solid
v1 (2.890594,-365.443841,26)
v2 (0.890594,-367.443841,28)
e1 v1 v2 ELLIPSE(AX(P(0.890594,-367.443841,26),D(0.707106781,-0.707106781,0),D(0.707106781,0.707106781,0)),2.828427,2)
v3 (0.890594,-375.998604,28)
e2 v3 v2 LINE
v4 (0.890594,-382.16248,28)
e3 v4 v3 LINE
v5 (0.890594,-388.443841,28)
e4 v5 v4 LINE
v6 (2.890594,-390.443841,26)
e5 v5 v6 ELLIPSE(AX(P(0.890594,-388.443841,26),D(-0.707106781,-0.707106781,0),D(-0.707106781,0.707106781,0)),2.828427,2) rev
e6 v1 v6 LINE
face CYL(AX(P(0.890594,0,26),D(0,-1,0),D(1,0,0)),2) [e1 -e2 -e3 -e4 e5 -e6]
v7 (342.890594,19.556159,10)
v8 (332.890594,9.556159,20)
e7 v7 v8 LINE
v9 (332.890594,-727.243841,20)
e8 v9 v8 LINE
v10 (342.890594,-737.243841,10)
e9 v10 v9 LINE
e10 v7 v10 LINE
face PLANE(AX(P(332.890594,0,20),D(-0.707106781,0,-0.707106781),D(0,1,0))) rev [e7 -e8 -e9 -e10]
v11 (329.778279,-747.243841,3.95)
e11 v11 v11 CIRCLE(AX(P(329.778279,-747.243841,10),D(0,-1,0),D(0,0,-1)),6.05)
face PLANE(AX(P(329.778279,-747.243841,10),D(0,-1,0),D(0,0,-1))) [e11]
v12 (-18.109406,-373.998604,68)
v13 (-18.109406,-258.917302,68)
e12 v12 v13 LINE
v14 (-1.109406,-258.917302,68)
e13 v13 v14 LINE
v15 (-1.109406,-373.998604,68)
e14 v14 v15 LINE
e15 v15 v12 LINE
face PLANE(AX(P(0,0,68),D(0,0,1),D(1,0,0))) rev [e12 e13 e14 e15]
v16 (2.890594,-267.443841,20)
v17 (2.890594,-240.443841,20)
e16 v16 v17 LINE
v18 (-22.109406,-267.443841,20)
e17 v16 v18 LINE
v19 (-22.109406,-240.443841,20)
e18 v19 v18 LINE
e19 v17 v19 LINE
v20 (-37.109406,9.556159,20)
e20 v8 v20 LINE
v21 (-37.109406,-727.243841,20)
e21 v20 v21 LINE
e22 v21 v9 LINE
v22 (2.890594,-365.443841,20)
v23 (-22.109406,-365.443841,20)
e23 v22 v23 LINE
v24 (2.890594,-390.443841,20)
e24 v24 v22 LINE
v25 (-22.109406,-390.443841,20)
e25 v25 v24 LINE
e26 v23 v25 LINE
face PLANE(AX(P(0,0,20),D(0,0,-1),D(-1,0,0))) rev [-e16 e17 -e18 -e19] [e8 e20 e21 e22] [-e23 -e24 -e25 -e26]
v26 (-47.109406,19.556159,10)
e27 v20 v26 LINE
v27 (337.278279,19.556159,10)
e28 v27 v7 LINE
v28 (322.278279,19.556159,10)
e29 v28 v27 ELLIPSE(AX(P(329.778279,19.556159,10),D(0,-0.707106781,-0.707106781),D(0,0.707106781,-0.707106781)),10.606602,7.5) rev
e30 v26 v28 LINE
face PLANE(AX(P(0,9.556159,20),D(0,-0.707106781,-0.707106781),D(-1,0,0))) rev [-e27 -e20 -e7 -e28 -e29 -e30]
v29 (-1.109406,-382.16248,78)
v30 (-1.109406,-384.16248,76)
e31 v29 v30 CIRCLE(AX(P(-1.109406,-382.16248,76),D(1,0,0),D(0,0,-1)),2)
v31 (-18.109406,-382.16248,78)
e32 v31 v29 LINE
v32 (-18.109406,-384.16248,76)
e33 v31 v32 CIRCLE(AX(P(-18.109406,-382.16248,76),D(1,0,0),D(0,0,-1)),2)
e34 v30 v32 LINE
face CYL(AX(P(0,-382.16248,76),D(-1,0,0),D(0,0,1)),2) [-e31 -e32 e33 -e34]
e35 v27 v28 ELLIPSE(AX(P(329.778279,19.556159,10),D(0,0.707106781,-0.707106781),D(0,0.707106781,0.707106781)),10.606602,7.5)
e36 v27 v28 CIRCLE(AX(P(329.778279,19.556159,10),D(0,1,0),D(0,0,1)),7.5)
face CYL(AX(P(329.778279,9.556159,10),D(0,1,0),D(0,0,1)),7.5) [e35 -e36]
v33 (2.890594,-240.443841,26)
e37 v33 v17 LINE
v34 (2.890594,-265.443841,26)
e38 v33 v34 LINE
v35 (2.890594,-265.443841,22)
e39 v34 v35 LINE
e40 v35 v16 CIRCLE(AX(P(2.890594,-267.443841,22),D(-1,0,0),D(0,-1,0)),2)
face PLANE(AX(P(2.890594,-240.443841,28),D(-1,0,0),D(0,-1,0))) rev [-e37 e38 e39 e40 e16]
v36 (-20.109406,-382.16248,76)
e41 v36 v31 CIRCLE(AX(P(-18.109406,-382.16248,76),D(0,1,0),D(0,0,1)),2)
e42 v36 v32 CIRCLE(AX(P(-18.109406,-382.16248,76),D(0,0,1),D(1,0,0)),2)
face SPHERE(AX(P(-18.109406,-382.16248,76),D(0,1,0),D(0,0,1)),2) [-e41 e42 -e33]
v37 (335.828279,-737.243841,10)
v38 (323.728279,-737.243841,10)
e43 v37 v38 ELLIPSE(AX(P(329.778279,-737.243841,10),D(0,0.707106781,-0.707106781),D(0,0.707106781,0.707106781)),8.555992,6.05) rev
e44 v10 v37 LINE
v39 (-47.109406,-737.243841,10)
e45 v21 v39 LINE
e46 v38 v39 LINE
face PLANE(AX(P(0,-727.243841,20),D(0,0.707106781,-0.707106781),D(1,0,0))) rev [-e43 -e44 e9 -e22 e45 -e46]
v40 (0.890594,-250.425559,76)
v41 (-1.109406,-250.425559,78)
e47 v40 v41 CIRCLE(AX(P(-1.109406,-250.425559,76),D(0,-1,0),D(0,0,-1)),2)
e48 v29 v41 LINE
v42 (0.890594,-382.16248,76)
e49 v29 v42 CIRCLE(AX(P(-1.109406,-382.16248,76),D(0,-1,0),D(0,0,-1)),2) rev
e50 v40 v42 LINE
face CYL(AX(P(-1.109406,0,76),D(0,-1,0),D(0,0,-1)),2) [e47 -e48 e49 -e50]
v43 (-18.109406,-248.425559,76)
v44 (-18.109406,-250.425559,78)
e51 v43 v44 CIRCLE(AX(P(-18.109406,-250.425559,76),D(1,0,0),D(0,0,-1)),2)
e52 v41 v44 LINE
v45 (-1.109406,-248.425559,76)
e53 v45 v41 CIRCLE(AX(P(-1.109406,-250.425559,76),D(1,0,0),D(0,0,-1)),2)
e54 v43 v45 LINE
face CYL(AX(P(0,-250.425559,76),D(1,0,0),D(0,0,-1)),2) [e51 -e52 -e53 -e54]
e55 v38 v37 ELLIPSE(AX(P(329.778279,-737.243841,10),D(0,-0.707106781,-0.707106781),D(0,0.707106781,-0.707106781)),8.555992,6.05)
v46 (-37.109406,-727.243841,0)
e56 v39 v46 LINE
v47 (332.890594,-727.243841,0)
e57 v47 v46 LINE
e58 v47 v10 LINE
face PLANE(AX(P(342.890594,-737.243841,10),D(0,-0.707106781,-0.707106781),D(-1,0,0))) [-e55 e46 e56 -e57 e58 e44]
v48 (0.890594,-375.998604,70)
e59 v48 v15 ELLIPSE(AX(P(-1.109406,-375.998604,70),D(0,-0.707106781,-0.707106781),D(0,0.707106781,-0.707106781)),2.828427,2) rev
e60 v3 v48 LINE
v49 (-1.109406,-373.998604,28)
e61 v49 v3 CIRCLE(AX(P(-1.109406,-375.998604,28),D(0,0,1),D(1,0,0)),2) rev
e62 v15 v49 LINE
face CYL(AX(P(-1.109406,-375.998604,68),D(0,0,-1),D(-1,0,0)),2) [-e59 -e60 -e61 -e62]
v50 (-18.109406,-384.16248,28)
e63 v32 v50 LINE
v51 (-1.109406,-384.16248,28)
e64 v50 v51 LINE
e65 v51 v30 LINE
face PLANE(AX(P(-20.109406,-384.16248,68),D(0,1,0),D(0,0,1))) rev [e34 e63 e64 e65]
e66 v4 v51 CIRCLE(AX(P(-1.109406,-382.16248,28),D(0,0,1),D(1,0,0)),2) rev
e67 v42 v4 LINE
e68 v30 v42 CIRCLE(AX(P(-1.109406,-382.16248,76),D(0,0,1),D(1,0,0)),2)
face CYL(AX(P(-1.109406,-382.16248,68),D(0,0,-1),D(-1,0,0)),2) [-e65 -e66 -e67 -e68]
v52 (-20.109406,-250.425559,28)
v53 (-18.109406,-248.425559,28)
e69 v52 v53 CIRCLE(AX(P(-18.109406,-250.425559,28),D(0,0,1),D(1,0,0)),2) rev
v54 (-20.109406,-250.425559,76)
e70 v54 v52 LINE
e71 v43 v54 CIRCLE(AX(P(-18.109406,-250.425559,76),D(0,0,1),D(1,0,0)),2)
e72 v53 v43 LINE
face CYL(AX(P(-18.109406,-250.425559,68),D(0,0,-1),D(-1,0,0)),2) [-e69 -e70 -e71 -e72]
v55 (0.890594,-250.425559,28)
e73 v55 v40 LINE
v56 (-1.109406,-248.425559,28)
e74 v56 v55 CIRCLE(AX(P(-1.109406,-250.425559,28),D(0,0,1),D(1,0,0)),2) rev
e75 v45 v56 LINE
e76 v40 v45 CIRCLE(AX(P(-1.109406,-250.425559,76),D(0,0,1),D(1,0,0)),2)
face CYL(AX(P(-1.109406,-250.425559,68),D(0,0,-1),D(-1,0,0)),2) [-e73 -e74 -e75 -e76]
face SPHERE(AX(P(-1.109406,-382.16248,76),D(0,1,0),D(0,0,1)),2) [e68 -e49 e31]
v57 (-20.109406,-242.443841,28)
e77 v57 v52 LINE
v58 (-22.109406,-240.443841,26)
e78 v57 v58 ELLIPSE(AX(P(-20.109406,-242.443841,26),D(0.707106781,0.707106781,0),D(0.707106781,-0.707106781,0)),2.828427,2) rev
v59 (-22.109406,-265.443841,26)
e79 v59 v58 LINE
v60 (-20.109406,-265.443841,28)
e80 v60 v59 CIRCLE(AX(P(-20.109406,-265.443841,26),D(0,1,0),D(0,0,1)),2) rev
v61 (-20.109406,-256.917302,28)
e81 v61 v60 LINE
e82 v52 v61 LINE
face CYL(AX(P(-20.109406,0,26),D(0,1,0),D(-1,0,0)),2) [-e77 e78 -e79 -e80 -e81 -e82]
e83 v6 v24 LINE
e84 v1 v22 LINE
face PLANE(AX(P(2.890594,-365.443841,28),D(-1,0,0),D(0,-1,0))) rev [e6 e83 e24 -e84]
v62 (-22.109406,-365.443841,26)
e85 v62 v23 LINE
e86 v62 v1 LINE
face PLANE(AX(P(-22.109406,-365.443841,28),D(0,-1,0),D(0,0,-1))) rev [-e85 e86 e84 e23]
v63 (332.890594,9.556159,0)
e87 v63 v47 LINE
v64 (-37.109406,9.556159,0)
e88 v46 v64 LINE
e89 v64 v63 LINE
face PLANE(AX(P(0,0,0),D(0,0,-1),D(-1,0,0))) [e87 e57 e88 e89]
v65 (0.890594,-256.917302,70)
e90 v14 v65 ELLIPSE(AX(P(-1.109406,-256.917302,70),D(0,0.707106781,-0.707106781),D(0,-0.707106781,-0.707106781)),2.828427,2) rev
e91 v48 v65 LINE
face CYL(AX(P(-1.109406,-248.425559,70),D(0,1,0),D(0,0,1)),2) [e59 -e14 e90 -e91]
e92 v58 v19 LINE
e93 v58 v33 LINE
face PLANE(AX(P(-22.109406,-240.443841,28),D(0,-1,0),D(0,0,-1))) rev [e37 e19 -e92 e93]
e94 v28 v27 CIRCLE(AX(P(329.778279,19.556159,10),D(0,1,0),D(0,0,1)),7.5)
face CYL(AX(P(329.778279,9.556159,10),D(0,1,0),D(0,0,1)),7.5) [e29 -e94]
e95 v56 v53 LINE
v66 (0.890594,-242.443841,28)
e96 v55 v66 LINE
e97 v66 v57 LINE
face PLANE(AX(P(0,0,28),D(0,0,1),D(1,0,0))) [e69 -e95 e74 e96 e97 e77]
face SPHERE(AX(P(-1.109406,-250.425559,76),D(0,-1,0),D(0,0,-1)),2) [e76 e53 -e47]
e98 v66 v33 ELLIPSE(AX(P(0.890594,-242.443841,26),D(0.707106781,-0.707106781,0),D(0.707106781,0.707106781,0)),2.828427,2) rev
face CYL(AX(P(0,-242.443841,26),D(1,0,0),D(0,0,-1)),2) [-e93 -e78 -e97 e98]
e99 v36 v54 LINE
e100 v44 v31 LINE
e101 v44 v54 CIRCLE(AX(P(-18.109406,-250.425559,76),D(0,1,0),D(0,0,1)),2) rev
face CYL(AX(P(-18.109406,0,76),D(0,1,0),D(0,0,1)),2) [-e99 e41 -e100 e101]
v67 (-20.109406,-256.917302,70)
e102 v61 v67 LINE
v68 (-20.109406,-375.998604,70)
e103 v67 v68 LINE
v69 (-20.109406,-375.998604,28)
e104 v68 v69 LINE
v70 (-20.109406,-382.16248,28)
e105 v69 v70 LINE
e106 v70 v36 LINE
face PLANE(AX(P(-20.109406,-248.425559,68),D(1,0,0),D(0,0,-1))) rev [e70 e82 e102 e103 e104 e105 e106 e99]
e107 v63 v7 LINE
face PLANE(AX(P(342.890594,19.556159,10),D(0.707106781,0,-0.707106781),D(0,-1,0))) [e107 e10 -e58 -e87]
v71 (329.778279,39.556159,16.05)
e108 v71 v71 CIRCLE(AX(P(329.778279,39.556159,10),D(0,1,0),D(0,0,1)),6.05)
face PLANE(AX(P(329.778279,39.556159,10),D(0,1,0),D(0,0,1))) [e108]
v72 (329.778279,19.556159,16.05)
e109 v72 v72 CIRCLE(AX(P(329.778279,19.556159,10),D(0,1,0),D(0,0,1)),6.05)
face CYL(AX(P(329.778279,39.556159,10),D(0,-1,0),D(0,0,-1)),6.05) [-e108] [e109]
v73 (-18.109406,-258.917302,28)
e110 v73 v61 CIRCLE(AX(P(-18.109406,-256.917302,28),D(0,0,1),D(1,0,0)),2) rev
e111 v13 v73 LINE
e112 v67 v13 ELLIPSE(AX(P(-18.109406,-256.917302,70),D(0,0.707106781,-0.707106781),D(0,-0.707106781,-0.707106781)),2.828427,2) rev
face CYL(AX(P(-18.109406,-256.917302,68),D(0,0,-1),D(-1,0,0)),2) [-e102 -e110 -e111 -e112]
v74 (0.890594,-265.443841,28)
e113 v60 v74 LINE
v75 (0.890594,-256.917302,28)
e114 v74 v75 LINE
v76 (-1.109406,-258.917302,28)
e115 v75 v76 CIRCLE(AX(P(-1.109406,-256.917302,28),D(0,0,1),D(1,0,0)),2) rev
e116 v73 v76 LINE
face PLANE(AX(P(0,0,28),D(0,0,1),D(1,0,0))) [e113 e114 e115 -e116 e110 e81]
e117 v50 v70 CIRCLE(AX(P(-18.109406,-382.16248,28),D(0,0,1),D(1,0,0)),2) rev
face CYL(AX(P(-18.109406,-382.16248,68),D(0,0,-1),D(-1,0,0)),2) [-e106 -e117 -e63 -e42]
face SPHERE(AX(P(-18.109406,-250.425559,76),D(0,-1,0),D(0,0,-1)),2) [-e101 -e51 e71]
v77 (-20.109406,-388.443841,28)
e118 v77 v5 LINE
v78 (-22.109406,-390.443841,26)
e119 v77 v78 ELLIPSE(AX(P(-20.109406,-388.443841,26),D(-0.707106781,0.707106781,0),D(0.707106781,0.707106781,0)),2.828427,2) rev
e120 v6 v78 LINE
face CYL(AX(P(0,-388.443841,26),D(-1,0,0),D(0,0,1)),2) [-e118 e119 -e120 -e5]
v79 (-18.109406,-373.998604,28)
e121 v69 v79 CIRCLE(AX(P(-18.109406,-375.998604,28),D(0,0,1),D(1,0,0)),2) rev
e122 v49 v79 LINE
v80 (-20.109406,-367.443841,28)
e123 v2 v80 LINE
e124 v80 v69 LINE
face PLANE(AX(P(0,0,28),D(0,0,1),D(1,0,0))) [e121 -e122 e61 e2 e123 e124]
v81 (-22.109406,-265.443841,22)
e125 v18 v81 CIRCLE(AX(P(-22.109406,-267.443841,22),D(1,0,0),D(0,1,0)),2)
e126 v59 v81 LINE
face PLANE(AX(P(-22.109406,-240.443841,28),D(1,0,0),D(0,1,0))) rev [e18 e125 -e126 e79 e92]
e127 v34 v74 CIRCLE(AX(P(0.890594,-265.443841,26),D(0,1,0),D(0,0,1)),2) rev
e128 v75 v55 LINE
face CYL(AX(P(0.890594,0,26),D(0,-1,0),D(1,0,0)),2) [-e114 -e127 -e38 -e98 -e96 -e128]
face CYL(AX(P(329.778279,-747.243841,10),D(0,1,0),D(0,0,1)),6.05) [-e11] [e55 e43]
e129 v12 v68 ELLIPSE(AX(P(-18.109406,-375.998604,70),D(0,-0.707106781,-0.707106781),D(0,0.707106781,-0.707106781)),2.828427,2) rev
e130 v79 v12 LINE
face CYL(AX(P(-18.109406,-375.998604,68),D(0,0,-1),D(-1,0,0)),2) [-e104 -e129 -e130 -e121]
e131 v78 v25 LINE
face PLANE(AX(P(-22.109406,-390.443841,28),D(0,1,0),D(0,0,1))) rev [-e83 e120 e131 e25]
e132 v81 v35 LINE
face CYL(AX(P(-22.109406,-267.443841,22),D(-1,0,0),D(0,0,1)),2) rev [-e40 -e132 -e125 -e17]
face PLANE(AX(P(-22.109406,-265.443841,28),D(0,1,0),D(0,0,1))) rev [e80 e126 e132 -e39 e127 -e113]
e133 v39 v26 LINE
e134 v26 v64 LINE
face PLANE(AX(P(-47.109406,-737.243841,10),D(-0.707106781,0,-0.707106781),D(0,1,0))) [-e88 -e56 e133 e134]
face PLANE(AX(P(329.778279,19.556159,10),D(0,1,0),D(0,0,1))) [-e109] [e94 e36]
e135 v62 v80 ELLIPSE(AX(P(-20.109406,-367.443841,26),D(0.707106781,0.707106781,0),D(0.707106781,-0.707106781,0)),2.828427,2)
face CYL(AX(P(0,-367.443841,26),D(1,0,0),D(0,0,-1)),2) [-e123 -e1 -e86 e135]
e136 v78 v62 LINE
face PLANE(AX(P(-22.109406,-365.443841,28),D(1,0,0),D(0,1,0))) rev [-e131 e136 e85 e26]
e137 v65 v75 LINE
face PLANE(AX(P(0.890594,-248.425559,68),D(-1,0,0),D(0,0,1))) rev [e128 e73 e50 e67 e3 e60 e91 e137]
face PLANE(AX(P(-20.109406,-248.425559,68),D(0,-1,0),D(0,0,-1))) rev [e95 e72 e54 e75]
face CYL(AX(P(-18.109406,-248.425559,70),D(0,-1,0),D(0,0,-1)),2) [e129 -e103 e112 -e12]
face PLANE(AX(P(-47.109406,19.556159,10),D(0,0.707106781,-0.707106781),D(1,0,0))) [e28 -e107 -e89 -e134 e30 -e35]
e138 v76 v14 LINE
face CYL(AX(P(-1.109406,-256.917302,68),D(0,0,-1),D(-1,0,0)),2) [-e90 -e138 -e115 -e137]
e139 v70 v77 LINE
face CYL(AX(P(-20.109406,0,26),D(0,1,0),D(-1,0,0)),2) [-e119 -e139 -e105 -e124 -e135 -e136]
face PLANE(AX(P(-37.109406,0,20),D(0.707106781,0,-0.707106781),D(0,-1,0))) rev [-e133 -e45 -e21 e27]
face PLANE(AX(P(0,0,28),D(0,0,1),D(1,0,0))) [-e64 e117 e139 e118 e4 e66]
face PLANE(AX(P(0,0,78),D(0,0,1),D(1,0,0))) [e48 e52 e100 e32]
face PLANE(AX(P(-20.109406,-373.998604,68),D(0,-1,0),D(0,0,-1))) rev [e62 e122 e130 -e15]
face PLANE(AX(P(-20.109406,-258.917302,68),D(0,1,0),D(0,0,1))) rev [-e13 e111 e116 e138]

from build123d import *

# Parameters (mm, degrees)
SKETCH1_W            = 390
SKETCH1_H            = 756.8
BOSS_EXTRUDE1_DEPTH  = 20
SKETCH2_R            = 6.05
BOSS_EXTRUDE2_DEPTH  = 10
BOSS_EXTRUDE3_START  = 10
SKETCH3_R            = 6.05
BOSS_EXTRUDE3_DEPTH  = 10
CHAMFER1_SIZE        = 10
BOSS_EXTRUDE4_DEPTH  = 50
SKETCH5_W            = 30
SKETCH5_H            = 160
CUT_EXTRUDE1_DEPTH   = 131
CHAMFER2_SIZE        = 10
CUT_EXTRUDE2_DEPTH   = 78
SKETCH7_W            = 25
SKETCH7_H            = 25
BOSS_EXTRUDE5_DEPTH  = 8
FILLET1_R            = 2
FILLET2_R            = 2
SKETCH8_W            = 21
SKETCH8_H            = 10.491742635
SKETCH8_H_2          = 10.163875677
BOSS_EXTRUDE6_DEPTH  = 40
SKETCH9_W            = 21
SKETCH9_H            = 135.736920339
BOSS_EXTRUDE7_DEPTH  = 10
FILLET3_R            = 2
FILLET4_R            = 2
SKETCH15_R           = 7.5
BOSS_EXTRUDE17_DEPTH = 20
SKETCH17_R           = 7.5
CUT_EXTRUDE7_DEPTH   = 10
SKETCH18_R           = 6.05
BOSS_EXTRUDE18_DEPTH = 20


with BuildPart() as part:
    # Sketch1 → Boss-Extrude1 (new body)
    with BuildSketch(Plane.XY):
        with Locations((147.890593688, -358.84384058)):
            Rectangle(SKETCH1_W, SKETCH1_H)
    extrude(amount=BOSS_EXTRUDE1_DEPTH)

    # Sketch2 → Boss-Extrude2 (add)
    with BuildSketch(Plane(origin=(0, 19.55615942, 0), x_dir=(1, 0, 0), z_dir=(0, 1, 0))):
        with Locations(Location((329.77827945, -10, 0), (0, 0, 90))):
            Circle(SKETCH2_R)
    extrude(amount=BOSS_EXTRUDE2_DEPTH)

    # Sketch3 → Boss-Extrude3 (add)
    with BuildSketch(Plane.XZ.offset(737.24384058).offset(BOSS_EXTRUDE3_START)):
        with Locations(Location((329.77827945, 10, 0), (0, 0, 270))):
            Circle(SKETCH3_R)
    extrude(amount=-BOSS_EXTRUDE3_DEPTH)

    # Chamfer1
    # the kernel refuses this chamfer: 10 mm, written as the material it takes off along each edge
    with BuildSketch(Plane(origin=(368.607423567, -737.24384058, 0), x_dir=(0, 0.9996219169112968, -0.027495876610586487), z_dir=(-1, 0, 0))) as chamfer1_piece_1_section:
        Polygon((CHAMFER1_SIZE * 0.999621916911, -CHAMFER1_SIZE * 0.0274958766106), (-CHAMFER1_SIZE * 0.0274958766106, -CHAMFER1_SIZE * 0.999621916911), (0, 0), align=None)
    chamfer1_piece_1 = extrude(amount=441.433659759, mode=Mode.PRIVATE)
    chamfer1_piece_1 = chamfer1_piece_1 - Plane(origin=(329.77827945, -733.933944157, 10), x_dir=(0, 0, -1), z_dir=(0, -1, 0)) * Cylinder(6.05, 923, mode=Mode.PRIVATE)
    add(chamfer1_piece_1, mode=Mode.SUBTRACT)
    with BuildSketch(Plane(origin=(-47.109406312, -762.960670459, 0), x_dir=(-0.027495876610586317, 0, 0.9996219169112968), z_dir=(0, 1, 0)), Plane(origin=(342.890593688, 45.2729893, 20), x_dir=(-0.9996219169112968, 0, 0.027495876610586282), z_dir=(0, -1, 0))) as chamfer1_piece_2:
        Polygon((CHAMFER1_SIZE * 0.999621916911, CHAMFER1_SIZE * 0.0274958766106), (-CHAMFER1_SIZE * 0.0274958766106, CHAMFER1_SIZE * 0.999621916911), (0, 0), align=None)
    extrude(amount=808.233659759, mode=Mode.SUBTRACT)
    with BuildSketch(Plane(origin=(-72.826236192, 19.55615942, 0), x_dir=(0, 0.027495876610586317, 0.9996219169112968), z_dir=(1, 0, 0))) as chamfer1_piece_3_section:
        Polygon((CHAMFER1_SIZE * 0.999621916911, CHAMFER1_SIZE * 0.0274958766106), (-CHAMFER1_SIZE * 0.0274958766106, CHAMFER1_SIZE * 0.999621916911), (0, 0), align=None)
    chamfer1_piece_3 = extrude(amount=441.433659759, mode=Mode.PRIVATE)
    chamfer1_piece_3 = chamfer1_piece_3 - Plane(origin=(329.77827945, 16.24626296, 10), x_dir=(0, 0, -1), z_dir=(0, -1, 0)) * Cylinder(6.05, 923, mode=Mode.PRIVATE)
    add(chamfer1_piece_3, mode=Mode.SUBTRACT)
    with BuildSketch(Plane(origin=(342.890593688, 45.2729893, 0), x_dir=(-0.9996219169112968, 0, -0.027495876610586334), z_dir=(0, -1, 0)), Plane(origin=(-47.109406312, -762.960670459, 20), x_dir=(-0.027495876610586317, 0, -0.9996219169112968), z_dir=(0, 1, 0))) as chamfer1_piece_4:
        Polygon((CHAMFER1_SIZE * 0.999621916911, -CHAMFER1_SIZE * 0.0274958766106), (-CHAMFER1_SIZE * 0.0274958766106, -CHAMFER1_SIZE * 0.999621916911), (0, 0), align=None)
    extrude(amount=808.233659759, mode=Mode.SUBTRACT)
    with BuildSketch(Plane(origin=(368.607423567, -737.24384058, 20), x_dir=(0, 0.9996219169112968, 0.02749587661058643), z_dir=(-1, 0, 0))) as chamfer1_piece_5_section:
        Polygon((CHAMFER1_SIZE * 0.999621916911, CHAMFER1_SIZE * 0.0274958766106), (-CHAMFER1_SIZE * 0.0274958766106, CHAMFER1_SIZE * 0.999621916911), (0, 0), align=None)
    chamfer1_piece_5 = extrude(amount=441.433659759, mode=Mode.PRIVATE)
    chamfer1_piece_5 = chamfer1_piece_5 - Plane(origin=(329.77827945, -733.933944133, 10), x_dir=(0, 0, -1), z_dir=(0, -1, 0)) * Cylinder(6.05, 923, mode=Mode.PRIVATE)
    add(chamfer1_piece_5, mode=Mode.SUBTRACT)
    with BuildSketch(Plane(origin=(-72.826236192, 19.55615942, 20), x_dir=(0, 0.027495876610586317, -0.9996219169112968), z_dir=(1, 0, 0))) as chamfer1_piece_6_section:
        Polygon((CHAMFER1_SIZE * 0.999621916911, -CHAMFER1_SIZE * 0.0274958766106), (-CHAMFER1_SIZE * 0.0274958766106, -CHAMFER1_SIZE * 0.999621916911), (0, 0), align=None)
    chamfer1_piece_6 = extrude(amount=441.433659759, mode=Mode.PRIVATE)
    chamfer1_piece_6 = chamfer1_piece_6 - Plane(origin=(329.77827945, 16.246262993, 10), x_dir=(0, 0, -1), z_dir=(0, -1, 0)) * Cylinder(6.05, 923, mode=Mode.PRIVATE)
    add(chamfer1_piece_6, mode=Mode.SUBTRACT)

    # Sketch4 → Boss-Extrude4 (add)
    with BuildSketch(Plane.XY.offset(20)):
        Polygon((12.890593688, -358.84384058), (12.890593688, -258.84384058), (-37.109406312, -258.84384058), (-37.109406312, -458.84384058), (12.890593688, -458.84384058), align=None)
    extrude(amount=BOSS_EXTRUDE4_DEPTH)

    # Sketch5 → Cut-Extrude1 (cut)
    with BuildSketch(Plane.ZY.offset(37.109406312)):
        with Locations((35, -358.84384058)):
            Rectangle(SKETCH5_W, SKETCH5_H)
    extrude(amount=-CUT_EXTRUDE1_DEPTH, mode=Mode.SUBTRACT)

    # Chamfer2
    chamfer2_edges = [part.edges().sort_by_distance(p)[0] for p in [
        (-37.109406312, -458.84384058, 45),
        (12.890593688, -458.84384058, 45),
        (12.890593688, -258.84384058, 45),
        (-37.109406312, -258.84384058, 45),
        (-12.109406312, -458.84384058, 70),
        (12.890593688, -358.84384058, 70),
        (-12.109406312, -258.84384058, 70),
        (-37.109406312, -358.84384058, 70),
    ]]
    chamfer(chamfer2_edges, length=CHAMFER2_SIZE)

    # Sketch6 → Cut-Extrude2 (cut)
    with BuildSketch(Plane.XY.offset(20)):
        Polygon((-37.109406312, -268.84384058), (-27.109406312, -258.84384058), (2.890593688, -258.84384058), (12.890593688, -268.84384058), (12.890593688, -448.84384058), (2.890593688, -458.84384058), (-27.109406312, -458.84384058), (-37.109406312, -448.84384058), align=None)
    extrude(amount=CUT_EXTRUDE2_DEPTH, mode=Mode.SUBTRACT)

    # Sketch7 → Boss-Extrude5 (add)
    with BuildSketch(Plane.XY.offset(20)):
        with Locations((-9.609406312, -252.94384058)):
            Rectangle(SKETCH7_W, SKETCH7_H)
        with Locations((-9.609406312, -377.94384058)):
            Rectangle(SKETCH7_W, SKETCH7_H)
    extrude(amount=BOSS_EXTRUDE5_DEPTH)

    # Fillet1
    fillet1_edges = [part.edges().sort_by_distance(p)[0] for p in [
        (-9.609406312, -265.44384058, 20),
        (-22.109406312, -252.94384058, 28),
        (2.890593688, -252.94384058, 28),
        (-9.609406312, -240.44384058, 28),
    ]]
    fillet(fillet1_edges, radius=FILLET1_R)

    # Fillet2
    fillet2_edges = [part.edges().sort_by_distance(p)[0] for p in [
        (-22.109406312, -377.94384058, 28),
        (-9.609406312, -390.44384058, 28),
        (2.890593688, -377.94384058, 28),
        (-9.609406312, -365.44384058, 28),
    ]]
    fillet(fillet2_edges, radius=FILLET2_R)

    # Sketch8 → Boss-Extrude6 (add)
    with BuildSketch(Plane.XY.offset(28)):
        with Locations((-9.609406312, -253.671430769)):
            Rectangle(SKETCH8_W, SKETCH8_H)
        with Locations((-9.609406312, -379.080541951)):
            Rectangle(SKETCH8_W, SKETCH8_H_2)
    extrude(amount=BOSS_EXTRUDE6_DEPTH)

    # Sketch9 → Boss-Extrude7 (add)
    with BuildSketch(Plane.XY.offset(68)):
        with Locations((-9.609406312, -316.294019621)):
            Rectangle(SKETCH9_W, SKETCH9_H)
    extrude(amount=BOSS_EXTRUDE7_DEPTH)

    # Fillet3
    fillet3_edges = [part.edges().sort_by_distance(p)[0] for p in [
        (-20.109406312, -316.457953099, 68),
        (0.890593688, -316.457953099, 68),
        (-20.109406312, -316.294019621, 78),
        (0.890593688, -316.294019621, 78),
    ]]
    fillet(fillet3_edges, radius=FILLET3_R)

    # Fillet4
    fillet4_edges = [part.edges().sort_by_distance(p)[0] for p in [
        (0.30480725, -248.425559451, 77.414213562),
        (-9.609406312, -248.425559451, 78),
        (-19.523619875, -248.425559451, 77.414213562),
        (0.30480725, -384.16247979, 77.414213562),
        (-19.523619875, -384.16247979, 77.414213562),
        (0.890593688, -258.917302086, 49),
        (0.890593688, -248.425559451, 52),
        (-20.109406312, -248.425559451, 52),
        (-20.109406312, -258.917302086, 49),
        (0.890593688, -373.998604113, 49),
        (-20.109406312, -373.998604113, 49),
        (-9.609406312, -384.16247979, 78),
        (0.890593688, -384.16247979, 52),
        (-20.109406312, -384.16247979, 52),
    ]]
    fillet(fillet4_edges, radius=FILLET4_R)

    # Sketch15 → Boss-Extrude17 (add)
    with BuildSketch(Plane(origin=(0, 29.55615942, 0), x_dir=(1, 0, 0), z_dir=(0, 1, 0))):
        with Locations(Location((329.77827945, -10, 0), (0, 0, 270))):
            Circle(SKETCH15_R)
    extrude(amount=-BOSS_EXTRUDE17_DEPTH)

    # Sketch17 → Cut-Extrude7 (cut)
    with BuildSketch(Plane(origin=(0, 29.55615942, 0), x_dir=(1, 0, 0), z_dir=(0, 1, 0))):
        with Locations((329.77827945, -10)):
            Circle(SKETCH17_R)
    extrude(amount=-CUT_EXTRUDE7_DEPTH, mode=Mode.SUBTRACT)

    # Sketch18 → Boss-Extrude18 (add)
    with BuildSketch(Plane(origin=(0, 19.55615942, 0), x_dir=(1, 0, 0), z_dir=(0, 1, 0))):
        with Locations(Location((329.77827945, -10, 0), (0, 0, 180))):
            Circle(SKETCH18_R)
    extrude(amount=BOSS_EXTRUDE18_DEPTH)


solid = part.part
